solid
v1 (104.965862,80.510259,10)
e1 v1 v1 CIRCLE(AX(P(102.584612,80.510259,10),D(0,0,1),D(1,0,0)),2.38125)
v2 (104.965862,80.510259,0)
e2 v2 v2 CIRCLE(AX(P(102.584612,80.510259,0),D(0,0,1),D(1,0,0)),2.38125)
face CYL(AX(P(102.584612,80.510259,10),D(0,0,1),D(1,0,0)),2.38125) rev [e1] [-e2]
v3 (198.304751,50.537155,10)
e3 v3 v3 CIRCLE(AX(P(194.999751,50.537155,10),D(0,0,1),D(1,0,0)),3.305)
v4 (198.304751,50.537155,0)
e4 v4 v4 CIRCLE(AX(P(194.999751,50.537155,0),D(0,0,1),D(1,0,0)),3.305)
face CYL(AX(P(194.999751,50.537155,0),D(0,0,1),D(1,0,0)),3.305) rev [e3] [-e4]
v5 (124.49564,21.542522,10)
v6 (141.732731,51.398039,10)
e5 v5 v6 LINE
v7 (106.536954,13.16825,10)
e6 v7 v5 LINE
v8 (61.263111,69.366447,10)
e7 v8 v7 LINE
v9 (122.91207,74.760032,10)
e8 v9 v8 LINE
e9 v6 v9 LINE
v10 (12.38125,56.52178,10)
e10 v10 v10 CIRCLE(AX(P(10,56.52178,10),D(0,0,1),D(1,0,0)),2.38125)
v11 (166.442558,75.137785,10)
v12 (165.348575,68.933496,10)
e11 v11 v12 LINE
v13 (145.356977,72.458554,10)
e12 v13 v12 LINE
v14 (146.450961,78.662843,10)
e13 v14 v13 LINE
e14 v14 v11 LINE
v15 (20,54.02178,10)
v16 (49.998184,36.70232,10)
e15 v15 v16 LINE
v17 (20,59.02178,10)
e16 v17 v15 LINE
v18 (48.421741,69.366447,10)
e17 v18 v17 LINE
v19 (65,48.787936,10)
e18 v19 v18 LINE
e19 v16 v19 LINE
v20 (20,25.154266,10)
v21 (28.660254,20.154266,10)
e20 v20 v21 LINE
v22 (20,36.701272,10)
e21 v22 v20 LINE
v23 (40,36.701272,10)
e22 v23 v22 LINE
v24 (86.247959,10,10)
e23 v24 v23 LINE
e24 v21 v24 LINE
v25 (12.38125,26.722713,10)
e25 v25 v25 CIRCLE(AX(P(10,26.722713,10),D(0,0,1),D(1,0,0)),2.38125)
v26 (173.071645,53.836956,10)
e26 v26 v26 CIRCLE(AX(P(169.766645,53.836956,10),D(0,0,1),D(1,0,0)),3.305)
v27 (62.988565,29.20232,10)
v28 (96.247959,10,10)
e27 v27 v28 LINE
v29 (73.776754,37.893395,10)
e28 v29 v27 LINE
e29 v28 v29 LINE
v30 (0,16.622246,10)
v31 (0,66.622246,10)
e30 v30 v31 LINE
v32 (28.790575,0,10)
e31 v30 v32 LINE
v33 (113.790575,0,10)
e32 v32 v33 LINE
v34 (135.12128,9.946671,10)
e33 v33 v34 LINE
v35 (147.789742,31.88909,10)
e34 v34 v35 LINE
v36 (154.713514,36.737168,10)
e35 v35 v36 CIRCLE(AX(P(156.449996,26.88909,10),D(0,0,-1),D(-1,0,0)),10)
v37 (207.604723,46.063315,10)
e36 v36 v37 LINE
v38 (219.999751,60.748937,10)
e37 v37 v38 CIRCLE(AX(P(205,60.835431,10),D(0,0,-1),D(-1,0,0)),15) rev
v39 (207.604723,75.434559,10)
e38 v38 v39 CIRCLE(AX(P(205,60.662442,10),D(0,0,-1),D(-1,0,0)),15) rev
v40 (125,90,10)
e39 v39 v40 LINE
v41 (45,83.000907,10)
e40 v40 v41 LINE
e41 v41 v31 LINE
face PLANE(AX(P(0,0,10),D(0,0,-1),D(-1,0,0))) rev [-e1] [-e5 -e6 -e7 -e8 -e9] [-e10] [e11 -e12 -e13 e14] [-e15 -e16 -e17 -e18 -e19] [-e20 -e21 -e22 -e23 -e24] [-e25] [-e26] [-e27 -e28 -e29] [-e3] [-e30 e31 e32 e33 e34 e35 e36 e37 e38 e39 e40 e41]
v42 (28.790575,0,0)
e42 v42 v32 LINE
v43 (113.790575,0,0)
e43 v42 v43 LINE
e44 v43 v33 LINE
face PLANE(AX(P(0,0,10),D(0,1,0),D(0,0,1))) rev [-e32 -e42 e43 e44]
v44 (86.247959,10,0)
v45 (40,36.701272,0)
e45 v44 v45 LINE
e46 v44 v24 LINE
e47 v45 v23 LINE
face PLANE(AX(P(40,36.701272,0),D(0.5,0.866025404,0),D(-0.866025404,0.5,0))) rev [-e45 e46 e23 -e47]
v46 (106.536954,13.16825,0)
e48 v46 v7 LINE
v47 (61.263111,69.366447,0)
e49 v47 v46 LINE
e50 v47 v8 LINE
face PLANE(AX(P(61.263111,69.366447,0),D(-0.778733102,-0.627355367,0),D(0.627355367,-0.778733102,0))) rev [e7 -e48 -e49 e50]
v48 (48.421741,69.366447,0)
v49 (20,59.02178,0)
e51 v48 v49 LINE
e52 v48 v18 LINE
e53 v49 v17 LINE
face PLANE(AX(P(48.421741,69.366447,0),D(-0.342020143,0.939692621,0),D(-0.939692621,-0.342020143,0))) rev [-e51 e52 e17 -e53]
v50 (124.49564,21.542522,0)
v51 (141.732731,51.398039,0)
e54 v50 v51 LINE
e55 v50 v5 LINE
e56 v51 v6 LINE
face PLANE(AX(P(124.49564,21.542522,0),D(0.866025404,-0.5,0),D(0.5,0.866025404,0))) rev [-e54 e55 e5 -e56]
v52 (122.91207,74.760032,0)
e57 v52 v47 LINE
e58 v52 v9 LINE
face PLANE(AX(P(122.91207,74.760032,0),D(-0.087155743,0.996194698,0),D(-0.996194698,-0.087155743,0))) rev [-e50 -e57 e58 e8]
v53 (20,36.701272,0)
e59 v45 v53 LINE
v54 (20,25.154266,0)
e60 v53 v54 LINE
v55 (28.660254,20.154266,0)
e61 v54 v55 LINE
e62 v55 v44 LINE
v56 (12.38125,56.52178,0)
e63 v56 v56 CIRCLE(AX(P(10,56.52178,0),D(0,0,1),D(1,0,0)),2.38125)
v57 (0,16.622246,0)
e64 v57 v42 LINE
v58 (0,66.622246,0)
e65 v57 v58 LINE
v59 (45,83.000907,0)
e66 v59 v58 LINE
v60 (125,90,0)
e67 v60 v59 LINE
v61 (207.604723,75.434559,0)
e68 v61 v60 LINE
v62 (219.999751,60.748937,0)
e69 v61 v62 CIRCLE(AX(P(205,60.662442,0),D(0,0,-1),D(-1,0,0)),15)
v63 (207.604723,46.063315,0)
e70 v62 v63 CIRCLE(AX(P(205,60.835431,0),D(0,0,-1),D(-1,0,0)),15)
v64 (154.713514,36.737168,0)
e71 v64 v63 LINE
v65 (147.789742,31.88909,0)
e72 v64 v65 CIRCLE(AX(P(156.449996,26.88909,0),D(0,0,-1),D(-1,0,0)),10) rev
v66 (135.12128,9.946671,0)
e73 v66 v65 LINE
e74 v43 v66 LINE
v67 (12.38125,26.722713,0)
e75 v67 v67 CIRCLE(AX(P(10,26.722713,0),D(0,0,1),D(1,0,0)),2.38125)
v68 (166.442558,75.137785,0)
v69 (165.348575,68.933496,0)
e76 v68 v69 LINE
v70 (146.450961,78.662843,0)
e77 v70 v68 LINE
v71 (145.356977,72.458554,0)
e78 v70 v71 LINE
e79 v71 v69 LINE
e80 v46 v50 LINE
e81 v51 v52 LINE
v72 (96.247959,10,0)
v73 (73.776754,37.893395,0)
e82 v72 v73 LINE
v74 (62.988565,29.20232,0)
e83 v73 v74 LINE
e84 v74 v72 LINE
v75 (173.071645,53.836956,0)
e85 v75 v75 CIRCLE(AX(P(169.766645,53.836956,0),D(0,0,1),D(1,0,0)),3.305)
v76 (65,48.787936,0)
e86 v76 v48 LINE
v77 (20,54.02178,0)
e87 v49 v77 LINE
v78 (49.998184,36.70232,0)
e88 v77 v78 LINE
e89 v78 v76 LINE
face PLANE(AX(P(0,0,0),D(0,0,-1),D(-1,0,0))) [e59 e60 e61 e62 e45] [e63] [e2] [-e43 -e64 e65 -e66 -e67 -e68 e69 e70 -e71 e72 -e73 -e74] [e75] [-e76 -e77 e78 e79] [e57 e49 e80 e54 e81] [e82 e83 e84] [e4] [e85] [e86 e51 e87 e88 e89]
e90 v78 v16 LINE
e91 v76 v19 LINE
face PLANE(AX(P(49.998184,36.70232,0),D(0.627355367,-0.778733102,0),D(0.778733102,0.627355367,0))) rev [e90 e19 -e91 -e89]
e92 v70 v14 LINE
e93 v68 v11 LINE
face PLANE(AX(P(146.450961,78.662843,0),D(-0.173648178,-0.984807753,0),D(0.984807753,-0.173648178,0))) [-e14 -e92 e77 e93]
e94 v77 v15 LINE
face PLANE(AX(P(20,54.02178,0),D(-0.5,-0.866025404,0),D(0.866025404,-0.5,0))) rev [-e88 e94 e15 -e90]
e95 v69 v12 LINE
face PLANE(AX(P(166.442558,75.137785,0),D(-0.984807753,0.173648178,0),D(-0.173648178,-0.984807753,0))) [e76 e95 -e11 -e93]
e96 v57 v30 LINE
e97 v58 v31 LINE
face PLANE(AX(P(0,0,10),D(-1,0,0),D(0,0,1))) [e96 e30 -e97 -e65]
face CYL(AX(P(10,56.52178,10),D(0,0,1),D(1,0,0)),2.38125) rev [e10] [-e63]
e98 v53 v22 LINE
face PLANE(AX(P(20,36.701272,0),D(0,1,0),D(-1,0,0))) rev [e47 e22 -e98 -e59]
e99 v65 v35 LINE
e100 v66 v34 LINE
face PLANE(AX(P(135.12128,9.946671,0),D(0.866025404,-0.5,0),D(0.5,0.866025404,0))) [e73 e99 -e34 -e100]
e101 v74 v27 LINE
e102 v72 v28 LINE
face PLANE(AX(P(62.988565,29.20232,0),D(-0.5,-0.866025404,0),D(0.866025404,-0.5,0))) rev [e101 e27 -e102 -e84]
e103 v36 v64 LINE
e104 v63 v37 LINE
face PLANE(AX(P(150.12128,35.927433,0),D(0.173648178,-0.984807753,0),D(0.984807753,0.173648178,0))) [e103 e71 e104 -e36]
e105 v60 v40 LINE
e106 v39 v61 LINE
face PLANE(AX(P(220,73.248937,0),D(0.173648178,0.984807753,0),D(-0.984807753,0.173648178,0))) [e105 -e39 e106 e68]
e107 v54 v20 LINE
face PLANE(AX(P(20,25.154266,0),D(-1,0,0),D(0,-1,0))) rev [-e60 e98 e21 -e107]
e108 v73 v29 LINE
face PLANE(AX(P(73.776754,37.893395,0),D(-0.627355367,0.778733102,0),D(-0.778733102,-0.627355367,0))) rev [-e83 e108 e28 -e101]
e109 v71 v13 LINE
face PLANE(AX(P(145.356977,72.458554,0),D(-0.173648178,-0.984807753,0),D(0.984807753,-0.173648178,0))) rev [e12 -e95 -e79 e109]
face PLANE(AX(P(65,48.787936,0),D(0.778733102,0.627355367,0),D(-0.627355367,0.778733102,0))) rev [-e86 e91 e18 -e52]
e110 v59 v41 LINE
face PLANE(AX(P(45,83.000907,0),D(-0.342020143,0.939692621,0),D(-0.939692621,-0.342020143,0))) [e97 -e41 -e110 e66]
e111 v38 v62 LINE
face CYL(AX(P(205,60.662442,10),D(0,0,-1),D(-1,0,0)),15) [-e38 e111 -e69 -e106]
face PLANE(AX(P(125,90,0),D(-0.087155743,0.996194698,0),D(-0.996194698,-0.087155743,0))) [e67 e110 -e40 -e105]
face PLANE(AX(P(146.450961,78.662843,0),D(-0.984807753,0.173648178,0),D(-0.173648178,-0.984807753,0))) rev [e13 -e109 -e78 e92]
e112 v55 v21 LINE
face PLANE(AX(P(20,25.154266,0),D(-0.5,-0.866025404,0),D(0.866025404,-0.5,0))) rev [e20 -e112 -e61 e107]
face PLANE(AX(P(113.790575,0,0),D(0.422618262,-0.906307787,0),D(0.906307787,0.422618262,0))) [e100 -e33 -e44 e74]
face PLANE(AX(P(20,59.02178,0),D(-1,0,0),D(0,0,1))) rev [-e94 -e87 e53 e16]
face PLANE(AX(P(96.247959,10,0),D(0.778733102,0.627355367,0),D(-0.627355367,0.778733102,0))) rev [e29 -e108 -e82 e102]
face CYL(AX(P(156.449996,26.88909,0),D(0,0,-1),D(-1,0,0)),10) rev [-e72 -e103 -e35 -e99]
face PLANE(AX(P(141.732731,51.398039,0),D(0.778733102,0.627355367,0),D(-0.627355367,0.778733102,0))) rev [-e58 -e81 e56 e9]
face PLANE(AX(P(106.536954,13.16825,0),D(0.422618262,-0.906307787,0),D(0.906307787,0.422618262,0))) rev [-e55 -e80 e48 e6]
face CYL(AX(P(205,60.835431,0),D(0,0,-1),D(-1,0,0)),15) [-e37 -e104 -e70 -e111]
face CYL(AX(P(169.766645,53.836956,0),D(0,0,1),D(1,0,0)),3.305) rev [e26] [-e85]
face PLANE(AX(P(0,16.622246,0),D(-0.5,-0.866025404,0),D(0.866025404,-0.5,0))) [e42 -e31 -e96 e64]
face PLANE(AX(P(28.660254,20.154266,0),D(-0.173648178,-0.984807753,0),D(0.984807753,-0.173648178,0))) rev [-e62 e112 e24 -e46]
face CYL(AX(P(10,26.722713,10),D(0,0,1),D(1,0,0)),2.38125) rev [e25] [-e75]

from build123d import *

# Parameters (mm, degrees)
ESQUISSE1_W                             = 220
ESQUISSE1_H                             = 90
BOSS_EXTRU_1_DEPTH                      = 10
ESQUISSE2_OUTSIDE_W                     = 269.582
ESQUISSE2_OUTSIDE_H                     = 139.582
ENL_V_MAT_EXTRU_1_DEPTH                 = 238.907545067
ENL_V_MAT_EXTRU_2_DEPTH                 = 238.907545067
CONG_1_R                                = 15
ESQUISSE4_R                             = 3.305
ENL_V_MAT_EXTRU_3_DEPTH                 = 238.90731446
PER_AGE_POUR_CROUS_AUTO_BLOQUANTS_300_D = 4.7625
PER_AGE_POUR_CROUS_AUTO_BLOQUANTS_3_2_D = 4.7625
ENL_V_MAT_EXTRU_4_DEPTH                 = 10
CONG_2_R                                = 10


with BuildPart() as part:
    # Esquisse1 → Boss.-Extru.1 (new body)
    with BuildSketch(Plane.XY):
        with Locations((110, 45)):
            Rectangle(ESQUISSE1_W, ESQUISSE1_H)
    extrude(amount=BOSS_EXTRU_1_DEPTH)

    # Esquisse2 outside → Enlèv. mat.-Extru.1 (cut, through all)
    with BuildSketch(Plane.XY.offset(10)):
        with Locations((110, 45)):
            Rectangle(ESQUISSE2_OUTSIDE_W, ESQUISSE2_OUTSIDE_H)
        Polygon((220, 73.248936833), (125, 90), (45, 83.000906918), (0, 66.622246376), (0, 16.622246376), (28.790575259, 0), (113.790575259, 0), (135.121280108, 9.946671025), (150.121280108, 35.927433138), (220, 48.248936833), align=None, mode=Mode.SUBTRACT)
    extrude(amount=-ENL_V_MAT_EXTRU_1_DEPTH, mode=Mode.SUBTRACT)

    # Esquisse3 → Enlèv. mat.-Extru.2 (cut, through all)
    with BuildSketch(Plane.XY.offset(10)):
        Polygon((124.495639968, 21.542522439), (141.732730573, 51.398039143), (122.912069568, 74.760032194), (61.263110797, 69.366447183), (106.536954459, 13.168249856), align=None)
        Polygon((96.247958869, 10), (73.776753989, 37.893395035), (62.988565413, 29.202319765), align=None)
        Polygon((20, 25.154266119), (20, 36.701271503), (40, 36.701271503), (86.247958869, 10), (28.660254038, 20.154266119), align=None)
        Polygon((20, 54.021779578), (49.998184356, 36.702319765), (65, 48.78793618), (48.421740656, 69.366447183), (20, 59.021779578), align=None)
    extrude(amount=-ENL_V_MAT_EXTRU_2_DEPTH, mode=Mode.SUBTRACT)

    # Congé1
    # the kernel refuses this fillet: 15 mm, written as the material it takes off along each edge
    with BuildSketch(Plane(origin=(220, 73.248936833, 41.466236169), x_dir=(-0.9848077530122094, 0.17364817766692334, 0), z_dir=(0, 0, -1))) as cong_1_piece_1:
        with BuildLine():
            CenterArc((CONG_1_R * 0.839099631177, -CONG_1_R), CONG_1_R, 90, 80)
            Line((-CONG_1_R * 0.145708121835, -CONG_1_R * 0.826351822333), (0, 0))
            Line((0, 0), (CONG_1_R * 0.839099631177, 0))
        make_face()
    extrude(amount=72.932472338, mode=Mode.SUBTRACT)
    with BuildSketch(Plane(origin=(220, 48.248936833, 41.466236169), x_dir=(-0.9848077530122079, -0.17364817766693147, 0), z_dir=(0, 0, -1))) as cong_1_piece_2:
        with BuildLine():
            CenterArc((CONG_1_R * 0.839099631177, CONG_1_R), CONG_1_R, 190, 80)
            Line((-CONG_1_R * 0.145708121835, CONG_1_R * 0.826351822333), (0, 0))
            Line((0, 0), (CONG_1_R * 0.839099631177, 0))
        make_face()
    extrude(amount=72.932472338, mode=Mode.SUBTRACT)

    # Esquisse4 → Enlèv. mat.-Extru.3 (cut, through all)
    with BuildSketch(Plane.XY.offset(10)):
        with Locations((194.999750621, 50.537155323)):
            Circle(ESQUISSE4_R)
        with Locations((169.766644599, 53.836955846)):
            Circle(ESQUISSE4_R)
    extrude(amount=-ENL_V_MAT_EXTRU_3_DEPTH, mode=Mode.SUBTRACT)

    # Per_age pour _crous auto-bloquants 300 (through all)
    with Locations(Plane.XY.offset(10)):
        with Locations((102.584612496, 80.510258923)):
            Hole(PER_AGE_POUR_CROUS_AUTO_BLOQUANTS_300_D / 2)

    # Per_age pour _crous auto-bloquants 3 2 (through all)
    with Locations(Plane.XY.offset(10)):
        with Locations((10, 56.521779578), (10, 26.722713174)):
            Hole(PER_AGE_POUR_CROUS_AUTO_BLOQUANTS_3_2_D / 2)

    # Esquisse10 → Enlèv. mat.-Extru.4 (cut)
    with BuildSketch(Plane.XY.offset(10)):
        Polygon((146.450960741, 78.662842867), (145.356977222, 72.458554023), (165.348574608, 68.933496016), (166.442558127, 75.13778486), align=None)
    extrude(amount=-ENL_V_MAT_EXTRU_4_DEPTH, mode=Mode.SUBTRACT)

    # Congé2
    cong_2_edges = [part.edges().sort_by_distance(p)[0] for p in [
        (150.121280108, 35.927433138, 5),
    ]]
    fillet(cong_2_edges, radius=CONG_2_R)


solid = part.part
